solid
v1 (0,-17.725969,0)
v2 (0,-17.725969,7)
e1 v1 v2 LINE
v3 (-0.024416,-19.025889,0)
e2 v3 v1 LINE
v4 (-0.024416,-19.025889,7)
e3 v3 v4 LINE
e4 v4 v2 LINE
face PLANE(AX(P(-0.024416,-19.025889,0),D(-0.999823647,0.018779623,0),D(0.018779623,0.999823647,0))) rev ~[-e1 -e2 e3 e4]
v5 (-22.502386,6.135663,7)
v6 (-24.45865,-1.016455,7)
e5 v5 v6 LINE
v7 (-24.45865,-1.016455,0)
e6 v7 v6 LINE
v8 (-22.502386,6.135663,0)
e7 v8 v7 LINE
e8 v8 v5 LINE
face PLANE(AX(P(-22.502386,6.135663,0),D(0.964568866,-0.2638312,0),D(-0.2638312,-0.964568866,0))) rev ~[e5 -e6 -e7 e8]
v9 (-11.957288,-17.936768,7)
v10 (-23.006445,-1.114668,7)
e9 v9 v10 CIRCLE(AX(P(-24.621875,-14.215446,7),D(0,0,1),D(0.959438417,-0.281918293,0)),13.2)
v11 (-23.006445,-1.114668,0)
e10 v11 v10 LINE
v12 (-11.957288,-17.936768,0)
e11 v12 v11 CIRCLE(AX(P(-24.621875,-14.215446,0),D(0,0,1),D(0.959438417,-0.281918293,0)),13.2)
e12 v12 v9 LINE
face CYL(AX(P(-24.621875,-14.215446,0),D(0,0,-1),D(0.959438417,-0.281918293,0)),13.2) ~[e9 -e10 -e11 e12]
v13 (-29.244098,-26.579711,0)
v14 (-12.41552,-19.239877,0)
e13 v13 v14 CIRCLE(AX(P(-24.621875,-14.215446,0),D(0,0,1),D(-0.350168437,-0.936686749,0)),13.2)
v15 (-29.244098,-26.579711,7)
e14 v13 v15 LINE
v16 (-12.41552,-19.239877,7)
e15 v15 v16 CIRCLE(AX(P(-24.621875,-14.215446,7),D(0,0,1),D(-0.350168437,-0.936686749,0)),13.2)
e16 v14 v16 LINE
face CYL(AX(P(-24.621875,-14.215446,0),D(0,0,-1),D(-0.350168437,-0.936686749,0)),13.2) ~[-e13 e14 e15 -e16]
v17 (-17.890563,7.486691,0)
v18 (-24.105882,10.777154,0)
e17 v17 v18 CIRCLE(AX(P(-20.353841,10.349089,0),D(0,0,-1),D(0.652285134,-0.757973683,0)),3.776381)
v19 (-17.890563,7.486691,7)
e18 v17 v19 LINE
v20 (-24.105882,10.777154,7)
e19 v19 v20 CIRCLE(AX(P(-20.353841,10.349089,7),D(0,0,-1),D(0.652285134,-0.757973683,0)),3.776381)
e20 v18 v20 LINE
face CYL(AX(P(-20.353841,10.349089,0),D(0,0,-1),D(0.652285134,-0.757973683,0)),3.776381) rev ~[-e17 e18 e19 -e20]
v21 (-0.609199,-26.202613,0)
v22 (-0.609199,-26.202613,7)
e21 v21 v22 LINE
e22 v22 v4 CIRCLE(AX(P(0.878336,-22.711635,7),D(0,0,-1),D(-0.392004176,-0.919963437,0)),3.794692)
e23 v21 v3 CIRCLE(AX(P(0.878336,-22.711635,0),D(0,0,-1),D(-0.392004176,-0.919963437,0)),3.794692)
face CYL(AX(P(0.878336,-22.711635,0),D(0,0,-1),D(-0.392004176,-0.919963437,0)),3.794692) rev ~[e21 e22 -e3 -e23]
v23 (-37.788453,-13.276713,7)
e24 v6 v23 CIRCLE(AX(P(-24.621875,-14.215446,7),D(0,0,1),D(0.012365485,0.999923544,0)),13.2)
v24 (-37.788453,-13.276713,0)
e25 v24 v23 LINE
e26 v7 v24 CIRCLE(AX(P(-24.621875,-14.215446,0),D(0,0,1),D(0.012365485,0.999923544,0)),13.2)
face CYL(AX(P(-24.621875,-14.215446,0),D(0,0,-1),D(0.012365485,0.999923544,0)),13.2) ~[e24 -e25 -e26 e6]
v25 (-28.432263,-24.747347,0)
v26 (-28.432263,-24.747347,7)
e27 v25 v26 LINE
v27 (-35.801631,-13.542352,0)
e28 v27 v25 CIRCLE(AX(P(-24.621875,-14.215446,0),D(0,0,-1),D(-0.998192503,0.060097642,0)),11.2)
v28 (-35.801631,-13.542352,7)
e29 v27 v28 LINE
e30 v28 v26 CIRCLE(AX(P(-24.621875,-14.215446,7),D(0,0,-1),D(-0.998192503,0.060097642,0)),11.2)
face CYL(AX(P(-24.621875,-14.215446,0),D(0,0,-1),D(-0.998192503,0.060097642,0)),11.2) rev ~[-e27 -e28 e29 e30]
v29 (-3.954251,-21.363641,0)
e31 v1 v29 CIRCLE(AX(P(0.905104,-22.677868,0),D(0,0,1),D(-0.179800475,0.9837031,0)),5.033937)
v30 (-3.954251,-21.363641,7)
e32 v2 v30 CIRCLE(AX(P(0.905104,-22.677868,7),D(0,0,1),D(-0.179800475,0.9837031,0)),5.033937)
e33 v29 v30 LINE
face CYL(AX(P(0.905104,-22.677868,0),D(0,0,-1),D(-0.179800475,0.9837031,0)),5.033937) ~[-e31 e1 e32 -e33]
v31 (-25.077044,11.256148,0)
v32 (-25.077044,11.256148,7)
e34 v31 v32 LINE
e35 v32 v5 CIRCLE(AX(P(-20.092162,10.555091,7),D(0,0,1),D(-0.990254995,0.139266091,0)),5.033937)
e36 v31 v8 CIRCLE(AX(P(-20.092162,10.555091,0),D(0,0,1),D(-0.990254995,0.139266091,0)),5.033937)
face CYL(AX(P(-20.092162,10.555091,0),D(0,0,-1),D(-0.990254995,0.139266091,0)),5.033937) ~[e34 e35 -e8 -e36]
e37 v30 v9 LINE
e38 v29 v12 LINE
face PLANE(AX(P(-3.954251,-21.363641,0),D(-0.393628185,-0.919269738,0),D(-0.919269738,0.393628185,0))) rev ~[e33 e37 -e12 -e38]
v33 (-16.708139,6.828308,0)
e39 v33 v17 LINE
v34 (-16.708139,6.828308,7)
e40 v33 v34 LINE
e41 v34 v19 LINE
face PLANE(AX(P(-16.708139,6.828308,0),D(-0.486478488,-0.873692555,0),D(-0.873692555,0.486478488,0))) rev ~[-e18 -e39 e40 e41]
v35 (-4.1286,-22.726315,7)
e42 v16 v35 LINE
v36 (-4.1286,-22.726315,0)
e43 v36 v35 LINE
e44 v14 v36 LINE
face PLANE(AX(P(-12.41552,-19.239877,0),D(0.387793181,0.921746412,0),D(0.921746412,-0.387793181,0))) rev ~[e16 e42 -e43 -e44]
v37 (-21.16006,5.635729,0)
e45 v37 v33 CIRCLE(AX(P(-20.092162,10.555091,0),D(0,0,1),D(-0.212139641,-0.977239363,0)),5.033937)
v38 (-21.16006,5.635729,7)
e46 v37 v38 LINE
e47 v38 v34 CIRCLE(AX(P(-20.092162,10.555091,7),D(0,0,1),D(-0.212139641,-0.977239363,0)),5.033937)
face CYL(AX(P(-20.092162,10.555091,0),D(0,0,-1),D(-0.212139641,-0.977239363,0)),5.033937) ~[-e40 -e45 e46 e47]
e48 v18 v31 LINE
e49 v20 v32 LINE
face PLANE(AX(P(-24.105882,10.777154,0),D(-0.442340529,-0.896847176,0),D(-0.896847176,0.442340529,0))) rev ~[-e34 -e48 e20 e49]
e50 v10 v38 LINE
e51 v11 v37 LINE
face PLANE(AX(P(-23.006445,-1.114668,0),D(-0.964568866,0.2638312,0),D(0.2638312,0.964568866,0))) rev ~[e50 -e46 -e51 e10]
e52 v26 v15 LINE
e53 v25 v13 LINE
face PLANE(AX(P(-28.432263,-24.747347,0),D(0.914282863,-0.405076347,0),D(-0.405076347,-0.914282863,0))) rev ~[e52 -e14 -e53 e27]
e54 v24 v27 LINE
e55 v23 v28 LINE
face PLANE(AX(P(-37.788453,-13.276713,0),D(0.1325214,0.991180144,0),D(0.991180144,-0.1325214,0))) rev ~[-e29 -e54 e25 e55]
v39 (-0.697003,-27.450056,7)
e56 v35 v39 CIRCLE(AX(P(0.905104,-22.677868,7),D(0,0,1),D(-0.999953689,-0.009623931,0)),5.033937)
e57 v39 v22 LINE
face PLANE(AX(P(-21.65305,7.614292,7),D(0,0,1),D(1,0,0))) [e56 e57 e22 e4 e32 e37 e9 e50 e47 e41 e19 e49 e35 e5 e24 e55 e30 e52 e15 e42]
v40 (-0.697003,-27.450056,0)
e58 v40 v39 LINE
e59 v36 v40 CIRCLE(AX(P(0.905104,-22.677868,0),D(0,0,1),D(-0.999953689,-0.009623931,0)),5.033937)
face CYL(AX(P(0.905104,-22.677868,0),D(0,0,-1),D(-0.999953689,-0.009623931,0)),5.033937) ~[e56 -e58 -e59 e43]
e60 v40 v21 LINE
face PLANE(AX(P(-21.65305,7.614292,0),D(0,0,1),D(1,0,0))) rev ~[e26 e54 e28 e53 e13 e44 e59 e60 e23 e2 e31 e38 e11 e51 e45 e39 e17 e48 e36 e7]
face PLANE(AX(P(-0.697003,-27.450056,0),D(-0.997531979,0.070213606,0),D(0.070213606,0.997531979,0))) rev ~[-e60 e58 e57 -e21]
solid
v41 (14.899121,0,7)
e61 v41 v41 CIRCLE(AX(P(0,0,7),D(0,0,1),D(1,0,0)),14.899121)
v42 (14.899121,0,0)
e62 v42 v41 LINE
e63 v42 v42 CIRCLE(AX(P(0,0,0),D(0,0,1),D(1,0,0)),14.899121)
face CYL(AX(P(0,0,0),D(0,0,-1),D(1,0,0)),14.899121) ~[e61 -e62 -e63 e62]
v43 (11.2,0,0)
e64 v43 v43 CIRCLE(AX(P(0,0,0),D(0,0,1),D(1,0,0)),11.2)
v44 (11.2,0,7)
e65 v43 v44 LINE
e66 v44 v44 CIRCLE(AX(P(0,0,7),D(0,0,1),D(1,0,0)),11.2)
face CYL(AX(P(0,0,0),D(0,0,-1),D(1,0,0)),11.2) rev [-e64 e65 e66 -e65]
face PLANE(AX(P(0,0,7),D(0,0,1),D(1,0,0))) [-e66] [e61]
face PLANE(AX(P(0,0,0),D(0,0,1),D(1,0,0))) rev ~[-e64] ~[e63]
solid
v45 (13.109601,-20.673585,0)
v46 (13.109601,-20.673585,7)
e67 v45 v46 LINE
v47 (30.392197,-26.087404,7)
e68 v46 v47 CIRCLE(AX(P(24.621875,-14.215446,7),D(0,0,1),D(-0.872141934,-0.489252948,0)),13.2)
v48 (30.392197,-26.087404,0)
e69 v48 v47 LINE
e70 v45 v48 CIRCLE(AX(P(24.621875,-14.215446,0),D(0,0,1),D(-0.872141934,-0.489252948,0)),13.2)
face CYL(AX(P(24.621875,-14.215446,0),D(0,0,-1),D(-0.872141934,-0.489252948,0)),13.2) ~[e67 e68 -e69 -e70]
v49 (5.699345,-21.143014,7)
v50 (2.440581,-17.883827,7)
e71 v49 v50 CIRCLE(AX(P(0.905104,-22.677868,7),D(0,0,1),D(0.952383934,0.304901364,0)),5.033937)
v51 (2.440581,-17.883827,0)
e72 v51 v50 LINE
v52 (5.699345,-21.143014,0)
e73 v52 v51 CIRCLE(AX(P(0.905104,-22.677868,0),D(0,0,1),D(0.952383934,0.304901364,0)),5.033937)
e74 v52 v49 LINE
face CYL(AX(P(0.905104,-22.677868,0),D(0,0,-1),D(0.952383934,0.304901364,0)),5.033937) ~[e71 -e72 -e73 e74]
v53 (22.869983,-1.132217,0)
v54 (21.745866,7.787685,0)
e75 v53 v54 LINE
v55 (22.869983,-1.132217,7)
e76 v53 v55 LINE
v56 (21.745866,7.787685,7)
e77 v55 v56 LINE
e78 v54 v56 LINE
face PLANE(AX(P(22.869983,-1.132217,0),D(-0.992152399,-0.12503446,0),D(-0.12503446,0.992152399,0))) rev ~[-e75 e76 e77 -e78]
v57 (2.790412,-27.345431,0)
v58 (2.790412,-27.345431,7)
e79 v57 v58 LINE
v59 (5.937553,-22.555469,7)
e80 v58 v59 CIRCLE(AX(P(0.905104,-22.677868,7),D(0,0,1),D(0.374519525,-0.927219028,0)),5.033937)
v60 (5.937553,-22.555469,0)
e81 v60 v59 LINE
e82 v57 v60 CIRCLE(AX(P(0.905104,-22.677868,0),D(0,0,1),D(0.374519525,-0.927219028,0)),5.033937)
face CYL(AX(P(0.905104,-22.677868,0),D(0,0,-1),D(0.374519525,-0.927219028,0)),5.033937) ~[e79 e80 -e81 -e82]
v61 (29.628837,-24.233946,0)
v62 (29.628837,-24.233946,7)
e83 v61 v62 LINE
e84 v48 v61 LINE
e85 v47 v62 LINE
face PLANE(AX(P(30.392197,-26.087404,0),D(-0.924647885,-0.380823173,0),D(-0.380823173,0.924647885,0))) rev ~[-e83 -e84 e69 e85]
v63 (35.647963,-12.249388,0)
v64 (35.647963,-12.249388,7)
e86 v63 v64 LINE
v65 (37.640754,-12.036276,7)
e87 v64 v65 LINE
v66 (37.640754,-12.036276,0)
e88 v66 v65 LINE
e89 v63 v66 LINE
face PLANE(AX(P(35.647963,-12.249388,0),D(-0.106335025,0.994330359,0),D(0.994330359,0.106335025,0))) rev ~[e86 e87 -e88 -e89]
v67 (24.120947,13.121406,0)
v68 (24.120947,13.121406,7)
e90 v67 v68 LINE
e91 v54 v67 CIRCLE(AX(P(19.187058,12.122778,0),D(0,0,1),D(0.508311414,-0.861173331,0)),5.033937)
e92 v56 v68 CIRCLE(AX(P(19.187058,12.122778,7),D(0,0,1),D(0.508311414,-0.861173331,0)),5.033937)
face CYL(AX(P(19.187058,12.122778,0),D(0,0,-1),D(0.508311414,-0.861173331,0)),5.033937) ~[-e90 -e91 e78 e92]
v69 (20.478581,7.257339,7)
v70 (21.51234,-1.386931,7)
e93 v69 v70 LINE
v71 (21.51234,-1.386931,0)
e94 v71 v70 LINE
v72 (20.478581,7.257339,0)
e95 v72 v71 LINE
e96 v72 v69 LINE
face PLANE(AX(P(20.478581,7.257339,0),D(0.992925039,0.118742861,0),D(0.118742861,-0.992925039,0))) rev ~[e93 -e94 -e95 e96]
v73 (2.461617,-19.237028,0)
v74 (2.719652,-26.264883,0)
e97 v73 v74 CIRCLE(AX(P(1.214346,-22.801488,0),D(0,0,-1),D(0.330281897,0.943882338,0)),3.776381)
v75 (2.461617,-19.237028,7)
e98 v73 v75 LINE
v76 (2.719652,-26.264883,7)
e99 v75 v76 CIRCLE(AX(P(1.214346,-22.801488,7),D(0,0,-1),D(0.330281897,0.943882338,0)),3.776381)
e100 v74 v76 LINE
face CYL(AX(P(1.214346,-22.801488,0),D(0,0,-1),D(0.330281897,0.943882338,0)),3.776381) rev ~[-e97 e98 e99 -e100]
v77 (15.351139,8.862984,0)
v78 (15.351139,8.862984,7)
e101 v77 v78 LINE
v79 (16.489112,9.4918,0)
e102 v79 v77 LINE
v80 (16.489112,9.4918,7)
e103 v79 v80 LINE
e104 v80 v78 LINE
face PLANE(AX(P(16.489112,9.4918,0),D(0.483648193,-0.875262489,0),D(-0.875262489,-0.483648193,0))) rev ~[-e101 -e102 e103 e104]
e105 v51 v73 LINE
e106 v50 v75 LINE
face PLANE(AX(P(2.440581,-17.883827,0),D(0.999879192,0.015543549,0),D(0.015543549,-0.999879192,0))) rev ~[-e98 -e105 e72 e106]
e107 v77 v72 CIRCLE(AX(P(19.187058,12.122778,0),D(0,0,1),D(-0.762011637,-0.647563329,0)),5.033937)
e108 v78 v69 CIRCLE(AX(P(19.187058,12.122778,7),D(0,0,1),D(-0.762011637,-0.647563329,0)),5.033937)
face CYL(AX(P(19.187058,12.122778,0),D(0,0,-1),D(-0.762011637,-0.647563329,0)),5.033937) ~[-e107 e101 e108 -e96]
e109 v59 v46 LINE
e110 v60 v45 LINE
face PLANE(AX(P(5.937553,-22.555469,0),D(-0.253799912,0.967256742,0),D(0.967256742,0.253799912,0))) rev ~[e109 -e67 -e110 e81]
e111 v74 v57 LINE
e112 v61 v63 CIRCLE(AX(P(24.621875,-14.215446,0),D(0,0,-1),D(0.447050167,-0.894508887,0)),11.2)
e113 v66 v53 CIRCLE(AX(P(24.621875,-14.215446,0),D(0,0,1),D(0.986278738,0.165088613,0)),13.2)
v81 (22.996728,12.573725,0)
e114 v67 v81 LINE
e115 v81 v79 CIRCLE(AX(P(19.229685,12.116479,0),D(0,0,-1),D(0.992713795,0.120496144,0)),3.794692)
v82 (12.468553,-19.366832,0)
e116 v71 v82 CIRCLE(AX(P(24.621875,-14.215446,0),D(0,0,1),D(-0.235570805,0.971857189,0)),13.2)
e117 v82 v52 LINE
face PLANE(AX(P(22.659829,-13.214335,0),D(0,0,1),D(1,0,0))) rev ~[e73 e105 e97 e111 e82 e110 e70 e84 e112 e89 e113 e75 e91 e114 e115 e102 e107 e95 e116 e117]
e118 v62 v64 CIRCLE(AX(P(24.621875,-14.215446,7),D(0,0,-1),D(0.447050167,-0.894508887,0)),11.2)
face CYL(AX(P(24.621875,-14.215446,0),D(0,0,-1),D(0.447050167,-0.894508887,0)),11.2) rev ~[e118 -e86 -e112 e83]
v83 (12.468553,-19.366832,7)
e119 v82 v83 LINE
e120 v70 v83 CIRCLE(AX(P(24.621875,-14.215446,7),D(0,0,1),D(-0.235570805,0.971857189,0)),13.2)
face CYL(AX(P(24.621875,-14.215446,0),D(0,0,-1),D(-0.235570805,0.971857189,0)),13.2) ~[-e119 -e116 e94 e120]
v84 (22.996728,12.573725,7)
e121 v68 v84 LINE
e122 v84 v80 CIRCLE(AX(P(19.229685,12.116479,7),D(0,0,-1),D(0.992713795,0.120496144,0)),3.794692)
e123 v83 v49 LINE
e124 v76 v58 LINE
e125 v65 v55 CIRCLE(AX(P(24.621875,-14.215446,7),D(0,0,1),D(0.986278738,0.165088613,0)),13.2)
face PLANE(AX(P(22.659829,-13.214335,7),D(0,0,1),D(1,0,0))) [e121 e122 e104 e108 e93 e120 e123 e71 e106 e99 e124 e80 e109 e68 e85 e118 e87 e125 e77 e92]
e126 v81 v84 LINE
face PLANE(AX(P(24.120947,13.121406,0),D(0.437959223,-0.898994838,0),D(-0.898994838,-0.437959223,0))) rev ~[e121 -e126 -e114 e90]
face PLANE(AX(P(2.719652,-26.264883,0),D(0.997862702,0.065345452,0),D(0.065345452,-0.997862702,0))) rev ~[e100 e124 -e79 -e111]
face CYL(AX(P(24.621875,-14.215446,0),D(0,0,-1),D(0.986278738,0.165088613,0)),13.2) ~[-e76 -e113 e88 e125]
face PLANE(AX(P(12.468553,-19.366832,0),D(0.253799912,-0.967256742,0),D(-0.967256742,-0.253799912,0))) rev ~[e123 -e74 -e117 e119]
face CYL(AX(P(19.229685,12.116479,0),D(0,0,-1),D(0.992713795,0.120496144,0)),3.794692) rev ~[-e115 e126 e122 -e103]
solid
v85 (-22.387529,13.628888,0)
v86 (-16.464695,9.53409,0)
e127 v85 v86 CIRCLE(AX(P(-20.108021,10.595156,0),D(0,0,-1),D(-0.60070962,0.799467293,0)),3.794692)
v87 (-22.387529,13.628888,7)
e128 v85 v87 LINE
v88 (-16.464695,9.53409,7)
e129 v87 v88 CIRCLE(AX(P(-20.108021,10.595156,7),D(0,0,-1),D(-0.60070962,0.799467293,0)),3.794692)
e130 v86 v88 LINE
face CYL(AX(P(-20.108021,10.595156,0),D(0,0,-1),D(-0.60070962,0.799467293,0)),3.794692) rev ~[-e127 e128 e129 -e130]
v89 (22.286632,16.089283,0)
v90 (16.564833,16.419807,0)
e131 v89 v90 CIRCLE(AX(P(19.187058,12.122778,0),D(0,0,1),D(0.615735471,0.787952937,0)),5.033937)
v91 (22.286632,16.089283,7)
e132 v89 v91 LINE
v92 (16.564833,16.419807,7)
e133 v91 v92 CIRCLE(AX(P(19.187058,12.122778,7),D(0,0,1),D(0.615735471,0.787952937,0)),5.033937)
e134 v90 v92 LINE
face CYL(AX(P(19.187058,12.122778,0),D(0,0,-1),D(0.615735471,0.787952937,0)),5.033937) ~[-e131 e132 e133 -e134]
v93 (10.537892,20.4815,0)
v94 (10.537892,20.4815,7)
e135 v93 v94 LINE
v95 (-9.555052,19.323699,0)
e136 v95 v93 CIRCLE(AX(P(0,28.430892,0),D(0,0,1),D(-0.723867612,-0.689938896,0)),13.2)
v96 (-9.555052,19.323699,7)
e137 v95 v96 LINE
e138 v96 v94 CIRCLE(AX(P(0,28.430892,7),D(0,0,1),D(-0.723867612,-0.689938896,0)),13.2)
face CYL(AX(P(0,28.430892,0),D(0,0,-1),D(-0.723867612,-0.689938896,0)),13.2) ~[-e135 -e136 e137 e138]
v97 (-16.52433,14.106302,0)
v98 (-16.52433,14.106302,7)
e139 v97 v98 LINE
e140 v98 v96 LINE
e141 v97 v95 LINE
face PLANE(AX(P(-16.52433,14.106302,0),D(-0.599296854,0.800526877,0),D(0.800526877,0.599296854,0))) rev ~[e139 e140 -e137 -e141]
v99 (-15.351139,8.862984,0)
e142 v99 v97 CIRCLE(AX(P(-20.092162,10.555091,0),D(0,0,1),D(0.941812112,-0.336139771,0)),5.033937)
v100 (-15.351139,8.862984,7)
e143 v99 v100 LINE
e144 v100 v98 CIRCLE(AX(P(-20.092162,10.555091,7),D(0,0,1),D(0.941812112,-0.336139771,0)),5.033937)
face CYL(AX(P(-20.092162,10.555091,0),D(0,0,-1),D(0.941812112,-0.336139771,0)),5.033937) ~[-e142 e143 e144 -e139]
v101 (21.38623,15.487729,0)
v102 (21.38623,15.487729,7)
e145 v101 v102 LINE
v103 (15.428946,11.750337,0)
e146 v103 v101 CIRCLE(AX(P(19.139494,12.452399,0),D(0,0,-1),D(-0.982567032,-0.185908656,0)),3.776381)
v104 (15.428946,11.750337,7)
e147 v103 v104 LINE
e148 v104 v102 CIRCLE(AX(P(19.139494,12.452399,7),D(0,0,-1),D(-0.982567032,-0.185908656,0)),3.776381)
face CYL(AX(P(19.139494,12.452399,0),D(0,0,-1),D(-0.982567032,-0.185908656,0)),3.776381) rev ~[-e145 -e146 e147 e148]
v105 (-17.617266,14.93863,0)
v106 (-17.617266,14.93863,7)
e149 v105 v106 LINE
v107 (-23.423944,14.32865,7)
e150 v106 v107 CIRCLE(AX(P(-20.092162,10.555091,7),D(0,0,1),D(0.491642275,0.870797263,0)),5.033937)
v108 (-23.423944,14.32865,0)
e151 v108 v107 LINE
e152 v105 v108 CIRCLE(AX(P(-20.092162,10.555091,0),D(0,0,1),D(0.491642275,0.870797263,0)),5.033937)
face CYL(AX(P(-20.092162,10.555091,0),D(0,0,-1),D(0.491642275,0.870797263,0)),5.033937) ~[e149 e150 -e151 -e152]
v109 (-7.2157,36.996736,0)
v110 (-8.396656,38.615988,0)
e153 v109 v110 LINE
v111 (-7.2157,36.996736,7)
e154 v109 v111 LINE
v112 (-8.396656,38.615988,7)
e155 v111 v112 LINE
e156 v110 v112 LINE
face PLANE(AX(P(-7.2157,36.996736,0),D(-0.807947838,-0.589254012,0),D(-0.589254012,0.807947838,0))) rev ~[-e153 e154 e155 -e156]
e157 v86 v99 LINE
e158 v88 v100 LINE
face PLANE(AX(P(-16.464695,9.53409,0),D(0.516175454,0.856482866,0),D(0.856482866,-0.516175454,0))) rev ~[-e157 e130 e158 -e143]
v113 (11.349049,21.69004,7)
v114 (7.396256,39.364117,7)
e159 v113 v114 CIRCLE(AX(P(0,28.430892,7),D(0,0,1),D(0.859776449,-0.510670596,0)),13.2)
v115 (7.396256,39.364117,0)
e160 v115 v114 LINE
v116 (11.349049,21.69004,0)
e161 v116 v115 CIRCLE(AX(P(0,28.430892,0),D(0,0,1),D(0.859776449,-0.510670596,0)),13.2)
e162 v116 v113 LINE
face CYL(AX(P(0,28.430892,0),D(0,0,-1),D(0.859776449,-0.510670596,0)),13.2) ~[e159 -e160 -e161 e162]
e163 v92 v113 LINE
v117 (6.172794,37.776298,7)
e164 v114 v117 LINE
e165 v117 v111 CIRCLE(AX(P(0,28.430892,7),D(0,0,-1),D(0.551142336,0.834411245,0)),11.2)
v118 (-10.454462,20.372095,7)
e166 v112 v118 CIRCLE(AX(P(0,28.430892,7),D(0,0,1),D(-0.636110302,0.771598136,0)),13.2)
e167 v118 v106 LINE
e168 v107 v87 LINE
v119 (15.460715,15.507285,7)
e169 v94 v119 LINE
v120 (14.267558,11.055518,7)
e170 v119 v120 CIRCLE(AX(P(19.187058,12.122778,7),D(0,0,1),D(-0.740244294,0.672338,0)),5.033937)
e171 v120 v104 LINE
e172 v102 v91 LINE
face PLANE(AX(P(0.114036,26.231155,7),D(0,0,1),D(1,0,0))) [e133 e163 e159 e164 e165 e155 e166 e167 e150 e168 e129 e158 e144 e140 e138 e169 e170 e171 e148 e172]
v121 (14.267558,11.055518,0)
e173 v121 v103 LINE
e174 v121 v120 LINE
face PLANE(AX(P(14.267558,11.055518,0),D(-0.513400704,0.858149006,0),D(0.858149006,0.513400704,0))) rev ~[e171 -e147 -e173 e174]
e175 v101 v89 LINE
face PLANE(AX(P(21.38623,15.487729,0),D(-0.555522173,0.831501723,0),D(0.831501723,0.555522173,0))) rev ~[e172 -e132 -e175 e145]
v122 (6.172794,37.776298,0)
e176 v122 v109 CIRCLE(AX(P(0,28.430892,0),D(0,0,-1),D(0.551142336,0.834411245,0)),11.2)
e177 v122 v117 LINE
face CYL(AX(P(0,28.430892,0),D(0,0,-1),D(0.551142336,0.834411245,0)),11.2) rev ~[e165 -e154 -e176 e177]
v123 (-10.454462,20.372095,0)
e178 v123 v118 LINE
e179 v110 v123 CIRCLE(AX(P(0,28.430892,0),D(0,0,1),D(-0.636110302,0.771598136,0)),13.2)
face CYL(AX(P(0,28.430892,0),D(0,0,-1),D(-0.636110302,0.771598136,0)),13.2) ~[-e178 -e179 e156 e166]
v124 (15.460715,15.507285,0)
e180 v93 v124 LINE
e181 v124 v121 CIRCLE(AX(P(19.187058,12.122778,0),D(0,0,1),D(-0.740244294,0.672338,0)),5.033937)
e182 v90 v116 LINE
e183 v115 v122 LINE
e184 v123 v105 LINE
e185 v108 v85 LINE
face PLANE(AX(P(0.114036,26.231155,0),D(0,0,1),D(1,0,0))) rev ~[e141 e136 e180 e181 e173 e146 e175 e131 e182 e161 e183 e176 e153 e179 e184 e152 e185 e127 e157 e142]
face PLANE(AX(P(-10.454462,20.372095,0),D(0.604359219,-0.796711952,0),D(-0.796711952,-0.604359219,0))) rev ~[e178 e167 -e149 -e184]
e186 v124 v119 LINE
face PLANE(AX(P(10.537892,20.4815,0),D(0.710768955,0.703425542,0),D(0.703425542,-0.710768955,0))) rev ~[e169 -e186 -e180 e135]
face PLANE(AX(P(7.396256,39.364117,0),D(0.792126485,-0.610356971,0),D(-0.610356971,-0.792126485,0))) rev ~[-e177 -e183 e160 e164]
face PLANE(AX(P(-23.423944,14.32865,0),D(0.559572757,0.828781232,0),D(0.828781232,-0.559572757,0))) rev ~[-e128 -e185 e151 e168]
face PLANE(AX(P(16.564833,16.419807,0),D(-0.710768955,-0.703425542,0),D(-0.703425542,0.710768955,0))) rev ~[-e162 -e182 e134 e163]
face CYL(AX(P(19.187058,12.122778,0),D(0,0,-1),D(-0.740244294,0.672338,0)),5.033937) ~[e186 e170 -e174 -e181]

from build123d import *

# Parameters (mm, degrees)
F1_DEPTH = 7
F0_R     = 14.8991210618
F0_R_2   = 11.2


# Not quite as in the source:
# - a feature names something its author has since deleted; it is built from what else it names


with BuildPart() as f1:
    # F0 (on Top) → F1 (new body)
    with BuildSketch(Plane.XY):
        with BuildLine():
            ThreePointArc((6.1727941676, 37.7762980936), (0.6510319855, 17.2498297116), (-7.2157000853, 36.9967355036))
            Line((-7.2157000853, 36.9967355036), (-8.3966559852, 38.6159875526))
            ThreePointArc((-8.3966559852, 38.6159875526), (-13.1168240349, 29.9103945159), (-10.4544622583, 20.3720945463))
            ThreePointArc((-10.4544622583, 20.3720945463), (-10.0184805962, 19.8361235978), (-9.5550524793, 19.3236987275))
            ThreePointArc((-9.5550524793, 19.3236987275), (0.7593543067, 15.2527518823), (10.5378916113, 20.4814997005))
            ThreePointArc((10.5378916113, 20.4814997005), (10.9601407983, 21.0745810082), (11.3490491279, 21.6900402876))
            ThreePointArc((11.3490491279, 21.6900402876), (12.8817645708, 31.3118887778), (7.3962556563, 39.3641168512))
            Line((7.3962556563, 39.3641168512), (6.1727941676, 37.7762980936))
        make_face()
        with BuildLine():
            ThreePointArc((-9.5550524793, 19.3236987275), (-10.0184805962, 19.8361235978), (-10.4544622583, 20.3720945463))
            Line((-10.4544622583, 20.3720945463), (-17.617265947, 14.9386296298))
            ThreePointArc((-17.617265947, 14.9386296298), (-17.0422715879, 14.5599242823), (-16.5243304598, 14.1063019271))
            Line((-16.5243304598, 14.1063019271), (-9.5550524793, 19.3236987275))
        make_face()
        with BuildLine():
            Line((16.5648326928, 16.4198065392), (11.3490491279, 21.6900402876))
            ThreePointArc((11.3490491279, 21.6900402876), (10.9601407983, 21.0745810082), (10.5378916113, 20.4814997005))
            Line((10.5378916113, 20.4814997005), (15.4607146913, 15.5072847985))
            ThreePointArc((15.4607146913, 15.5072847985), (15.9801506346, 16.0030183777), (16.5648326928, 16.4198065392))
        make_face()
        with BuildLine():
            ThreePointArc((22.2866316895, 16.0892831325), (19.4773626659, 17.1483369014), (16.5648326928, 16.4198065392))
            ThreePointArc((16.5648326928, 16.4198065392), (15.9801506346, 16.0030183777), (15.4607146913, 15.5072847985))
            ThreePointArc((15.4607146913, 15.5072847985), (14.3247325692, 13.4259718238), (14.2675578592, 11.0555182525))
            Line((14.2675578592, 11.0555182525), (15.4289464152, 11.7503366329))
            ThreePointArc((15.4289464152, 11.7503366329), (17.1325780757, 15.6513583871), (21.3862302858, 15.4877294253))
            Line((21.3862302858, 15.4877294253), (22.2866316895, 16.0892831325))
        make_face()
        with BuildLine():
            ThreePointArc((-16.5243304598, 14.1063019271), (-17.0422715879, 14.5599242823), (-17.617265947, 14.9386296298))
            ThreePointArc((-17.617265947, 14.9386296298), (-20.6180729349, 15.5614809861), (-23.423944477, 14.3286503897))
            Line((-23.423944477, 14.3286503897), (-22.387528792, 13.6288879439))
            ThreePointArc((-22.387528792, 13.6288879439), (-17.9500491472, 13.7165086278), (-16.4646953344, 9.534089826))
            Line((-16.4646953344, 9.534089826), (-15.3511392531, 8.8629843801))
            ThreePointArc((-15.3511392531, 8.8629843801), (-15.1796922371, 11.6542550315), (-16.5243304598, 14.1063019271))
        make_face()
    extrude(amount=F1_DEPTH)


with BuildPart() as f1b:
    # F0 (on Top) → F1, piece 2 (new body)
    with BuildSketch(Plane.XY):
        Circle(F0_R)
        Circle(F0_R_2, mode=Mode.SUBTRACT)
    extrude(amount=F1_DEPTH)


with BuildPart() as f1c:
    # F0 (on Top) → F1, piece 3 (new body)
    with BuildSketch(Plane.XY):
        with BuildLine():
            ThreePointArc((29.6288367261, -24.2339456083), (14.6132747484, -9.1887250939), (35.6479628458, -12.2493881719))
            Line((35.6479628458, -12.2493881719), (37.6407542054, -12.0362763863))
            ThreePointArc((37.6407542054, -12.0362763863), (32.4615735054, -3.5956944267), (22.8699825346, -1.1322173746))
            ThreePointArc((22.8699825346, -1.1322173746), (22.1878272464, -1.2418030953), (21.5123402327, -1.3869311822))
            ThreePointArc((21.5123402327, -1.3869311822), (12.8295934543, -8.2839960612), (12.4685532426, -19.3668316879))
            ThreePointArc((12.4685532426, -19.3668316879), (12.7710521281, -20.0290508644), (13.1096013342, -20.6735849973))
            ThreePointArc((13.1096013342, -20.6735849973), (20.6760088367, -26.8118797528), (30.3921973626, -26.0874037168))
            Line((30.3921973626, -26.0874037168), (29.6288367261, -24.2339456083))
        make_face()
        with BuildLine():
            ThreePointArc((21.5123402327, -1.3869311822), (22.1878272464, -1.2418030953), (22.8699825346, -1.1322173746))
            Line((22.8699825346, -1.1322173746), (21.7458657307, 7.7876850405))
            ThreePointArc((21.7458657307, 7.7876850405), (21.1304000996, 7.4790779922), (20.4785810523, 7.2573389952))
            Line((20.4785810523, 7.2573389952), (21.5123402327, -1.3869311822))
        make_face()
        with BuildLine():
            ThreePointArc((20.4785810523, 7.2573389952), (21.1304000996, 7.4790779922), (21.7458657307, 7.7876850405))
            ThreePointArc((21.7458657307, 7.7876850405), (23.7856743219, 10.0750344456), (24.1209474779, 13.1214057791))
            Line((24.1209474779, 13.1214057791), (22.9967275808, 12.5737246899))
            ThreePointArc((22.9967275808, 12.5737246899), (20.8538694965, 8.6869442467), (16.4891116585, 9.4917995122))
            Line((16.4891116585, 9.4917995122), (15.3511392531, 8.8629843801))
            ThreePointArc((15.3511392531, 8.8629843801), (17.682727038, 7.3188715832), (20.4785810523, 7.2573389952))
        make_face()
        with BuildLine():
            Line((5.9375532417, -22.555469191), (13.1096013342, -20.6735849973))
            ThreePointArc((13.1096013342, -20.6735849973), (12.7710521281, -20.0290508644), (12.4685532426, -19.3668316879))
            Line((12.4685532426, -19.3668316879), (5.6993452336, -21.1430140826))
            ThreePointArc((5.6993452336, -21.1430140826), (5.868945135, -21.8407255947), (5.9375532417, -22.555469191))
        make_face()
        with BuildLine():
            ThreePointArc((2.7904120767, -27.3454307742), (5.1122140563, -25.4420593181), (5.9375532417, -22.555469191))
            ThreePointArc((5.9375532417, -22.555469191), (5.868945135, -21.8407255947), (5.6993452336, -21.1430140826))
            ThreePointArc((5.6993452336, -21.1430140826), (4.4648663853, -19.1185682192), (2.4405807291, -17.8838266823))
            Line((2.4405807291, -17.8838266823), (2.4616168195, -19.2370278656))
            ThreePointArc((2.4616168195, -19.2370278656), (4.9881849291, -22.6629270394), (2.7196519863, -26.2648834313))
            Line((2.7196519863, -26.2648834313), (2.7904120767, -27.3454307742))
        make_face()
    extrude(amount=F1_DEPTH)


with BuildPart() as f1d:
    # F0 (on Top) → F1, piece 4 (new body)
    with BuildSketch(Plane.XY):
        with BuildLine():
            ThreePointArc((-25.0770437662, 11.2561476417), (-24.5895767222, 8.2937224167), (-22.5023859345, 6.1356626518))
            ThreePointArc((-22.5023859345, 6.1356626518), (-21.8490957696, 5.837707217), (-21.1600599249, 5.6357292841))
            ThreePointArc((-21.1600599249, 5.6357292841), (-18.7895989545, 5.6925963955), (-16.7081385883, 6.8283084297))
            Line((-16.7081385883, 6.8283084297), (-17.8905632347, 7.4866912328))
            ThreePointArc((-17.8905632347, 7.4866912328), (-22.1207630048, 7.0115686523), (-24.1058822721, 10.7771540061))
            Line((-24.1058822721, 10.7771540061), (-25.0770437662, 11.2561476417))
        make_face()
        with BuildLine():
            ThreePointArc((-35.8016308938, -13.5423524853), (-15.264306734, -8.0611046177), (-28.4322627606, -24.7473473317))
            Line((-28.4322627606, -24.7473473317), (-29.2440982202, -26.5797111663))
            ThreePointArc((-29.2440982202, -26.5797111663), (-19.3447494705, -26.3147000891), (-12.4155202763, -19.2398771717))
            ThreePointArc((-12.4155202763, -19.2398771717), (-12.1693466502, -18.5943205025), (-11.9572877534, -17.9367675453))
            ThreePointArc((-11.9572877534, -17.9367675453), (-13.588947761, -6.968755821), (-23.0064448539, -1.1146680126))
            ThreePointArc((-23.0064448539, -1.1146680126), (-23.7311929263, -1.0455301438), (-24.4586504621, -1.0164552902))
            ThreePointArc((-24.4586504621, -1.0164552902), (-33.5577734074, -4.500009025), (-37.7884530188, -13.2767131344))
            Line((-37.7884530188, -13.2767131344), (-35.8016308938, -13.5423524853))
        make_face()
        with BuildLine():
            Line((-22.5023859345, 6.1356626518), (-24.4586504621, -1.0164552902))
            ThreePointArc((-24.4586504621, -1.0164552902), (-23.7311929263, -1.0455301438), (-23.0064448539, -1.1146680126))
            Line((-23.0064448539, -1.1146680126), (-21.1600599249, 5.6357292841))
            ThreePointArc((-21.1600599249, 5.6357292841), (-21.8490957696, 5.837707217), (-22.5023859345, 6.1356626518))
        make_face()
        with BuildLine():
            ThreePointArc((-11.9572877534, -17.9367675453), (-12.1693466502, -18.5943205025), (-12.4155202763, -19.2398771717))
            Line((-12.4155202763, -19.2398771717), (-4.1285997836, -22.7263146703))
            ThreePointArc((-4.1285997836, -22.7263146703), (-4.0881285117, -22.0390022745), (-3.9542505924, -21.3636409223))
            Line((-3.9542505924, -21.3636409223), (-11.9572877534, -17.9367675453))
        make_face()
        with BuildLine():
            ThreePointArc((-3.9542505924, -21.3636409223), (-4.0881285117, -22.0390022745), (-4.1285997836, -22.7263146703))
            ThreePointArc((-4.1285997836, -22.7263146703), (-3.1676013871, -25.6365154318), (-0.6970030009, -27.4500561688))
            Line((-0.6970030009, -27.4500561688), (-0.6091987888, -26.2026126338))
            ThreePointArc((-0.6091987888, -26.2026126338), (-2.9038203493, -22.4034528746), (-0.0244163241, -19.0258893382))
            Line((-0.0244163241, -19.0258893382), (0, -17.7259687602))
            ThreePointArc((0, -17.7259687602), (-2.5030348009, -18.9731266147), (-3.9542505924, -21.3636409223))
        make_face()
    extrude(amount=F1_DEPTH)


solid = Compound([f1.part, f1b.part, f1c.part, f1d.part])
